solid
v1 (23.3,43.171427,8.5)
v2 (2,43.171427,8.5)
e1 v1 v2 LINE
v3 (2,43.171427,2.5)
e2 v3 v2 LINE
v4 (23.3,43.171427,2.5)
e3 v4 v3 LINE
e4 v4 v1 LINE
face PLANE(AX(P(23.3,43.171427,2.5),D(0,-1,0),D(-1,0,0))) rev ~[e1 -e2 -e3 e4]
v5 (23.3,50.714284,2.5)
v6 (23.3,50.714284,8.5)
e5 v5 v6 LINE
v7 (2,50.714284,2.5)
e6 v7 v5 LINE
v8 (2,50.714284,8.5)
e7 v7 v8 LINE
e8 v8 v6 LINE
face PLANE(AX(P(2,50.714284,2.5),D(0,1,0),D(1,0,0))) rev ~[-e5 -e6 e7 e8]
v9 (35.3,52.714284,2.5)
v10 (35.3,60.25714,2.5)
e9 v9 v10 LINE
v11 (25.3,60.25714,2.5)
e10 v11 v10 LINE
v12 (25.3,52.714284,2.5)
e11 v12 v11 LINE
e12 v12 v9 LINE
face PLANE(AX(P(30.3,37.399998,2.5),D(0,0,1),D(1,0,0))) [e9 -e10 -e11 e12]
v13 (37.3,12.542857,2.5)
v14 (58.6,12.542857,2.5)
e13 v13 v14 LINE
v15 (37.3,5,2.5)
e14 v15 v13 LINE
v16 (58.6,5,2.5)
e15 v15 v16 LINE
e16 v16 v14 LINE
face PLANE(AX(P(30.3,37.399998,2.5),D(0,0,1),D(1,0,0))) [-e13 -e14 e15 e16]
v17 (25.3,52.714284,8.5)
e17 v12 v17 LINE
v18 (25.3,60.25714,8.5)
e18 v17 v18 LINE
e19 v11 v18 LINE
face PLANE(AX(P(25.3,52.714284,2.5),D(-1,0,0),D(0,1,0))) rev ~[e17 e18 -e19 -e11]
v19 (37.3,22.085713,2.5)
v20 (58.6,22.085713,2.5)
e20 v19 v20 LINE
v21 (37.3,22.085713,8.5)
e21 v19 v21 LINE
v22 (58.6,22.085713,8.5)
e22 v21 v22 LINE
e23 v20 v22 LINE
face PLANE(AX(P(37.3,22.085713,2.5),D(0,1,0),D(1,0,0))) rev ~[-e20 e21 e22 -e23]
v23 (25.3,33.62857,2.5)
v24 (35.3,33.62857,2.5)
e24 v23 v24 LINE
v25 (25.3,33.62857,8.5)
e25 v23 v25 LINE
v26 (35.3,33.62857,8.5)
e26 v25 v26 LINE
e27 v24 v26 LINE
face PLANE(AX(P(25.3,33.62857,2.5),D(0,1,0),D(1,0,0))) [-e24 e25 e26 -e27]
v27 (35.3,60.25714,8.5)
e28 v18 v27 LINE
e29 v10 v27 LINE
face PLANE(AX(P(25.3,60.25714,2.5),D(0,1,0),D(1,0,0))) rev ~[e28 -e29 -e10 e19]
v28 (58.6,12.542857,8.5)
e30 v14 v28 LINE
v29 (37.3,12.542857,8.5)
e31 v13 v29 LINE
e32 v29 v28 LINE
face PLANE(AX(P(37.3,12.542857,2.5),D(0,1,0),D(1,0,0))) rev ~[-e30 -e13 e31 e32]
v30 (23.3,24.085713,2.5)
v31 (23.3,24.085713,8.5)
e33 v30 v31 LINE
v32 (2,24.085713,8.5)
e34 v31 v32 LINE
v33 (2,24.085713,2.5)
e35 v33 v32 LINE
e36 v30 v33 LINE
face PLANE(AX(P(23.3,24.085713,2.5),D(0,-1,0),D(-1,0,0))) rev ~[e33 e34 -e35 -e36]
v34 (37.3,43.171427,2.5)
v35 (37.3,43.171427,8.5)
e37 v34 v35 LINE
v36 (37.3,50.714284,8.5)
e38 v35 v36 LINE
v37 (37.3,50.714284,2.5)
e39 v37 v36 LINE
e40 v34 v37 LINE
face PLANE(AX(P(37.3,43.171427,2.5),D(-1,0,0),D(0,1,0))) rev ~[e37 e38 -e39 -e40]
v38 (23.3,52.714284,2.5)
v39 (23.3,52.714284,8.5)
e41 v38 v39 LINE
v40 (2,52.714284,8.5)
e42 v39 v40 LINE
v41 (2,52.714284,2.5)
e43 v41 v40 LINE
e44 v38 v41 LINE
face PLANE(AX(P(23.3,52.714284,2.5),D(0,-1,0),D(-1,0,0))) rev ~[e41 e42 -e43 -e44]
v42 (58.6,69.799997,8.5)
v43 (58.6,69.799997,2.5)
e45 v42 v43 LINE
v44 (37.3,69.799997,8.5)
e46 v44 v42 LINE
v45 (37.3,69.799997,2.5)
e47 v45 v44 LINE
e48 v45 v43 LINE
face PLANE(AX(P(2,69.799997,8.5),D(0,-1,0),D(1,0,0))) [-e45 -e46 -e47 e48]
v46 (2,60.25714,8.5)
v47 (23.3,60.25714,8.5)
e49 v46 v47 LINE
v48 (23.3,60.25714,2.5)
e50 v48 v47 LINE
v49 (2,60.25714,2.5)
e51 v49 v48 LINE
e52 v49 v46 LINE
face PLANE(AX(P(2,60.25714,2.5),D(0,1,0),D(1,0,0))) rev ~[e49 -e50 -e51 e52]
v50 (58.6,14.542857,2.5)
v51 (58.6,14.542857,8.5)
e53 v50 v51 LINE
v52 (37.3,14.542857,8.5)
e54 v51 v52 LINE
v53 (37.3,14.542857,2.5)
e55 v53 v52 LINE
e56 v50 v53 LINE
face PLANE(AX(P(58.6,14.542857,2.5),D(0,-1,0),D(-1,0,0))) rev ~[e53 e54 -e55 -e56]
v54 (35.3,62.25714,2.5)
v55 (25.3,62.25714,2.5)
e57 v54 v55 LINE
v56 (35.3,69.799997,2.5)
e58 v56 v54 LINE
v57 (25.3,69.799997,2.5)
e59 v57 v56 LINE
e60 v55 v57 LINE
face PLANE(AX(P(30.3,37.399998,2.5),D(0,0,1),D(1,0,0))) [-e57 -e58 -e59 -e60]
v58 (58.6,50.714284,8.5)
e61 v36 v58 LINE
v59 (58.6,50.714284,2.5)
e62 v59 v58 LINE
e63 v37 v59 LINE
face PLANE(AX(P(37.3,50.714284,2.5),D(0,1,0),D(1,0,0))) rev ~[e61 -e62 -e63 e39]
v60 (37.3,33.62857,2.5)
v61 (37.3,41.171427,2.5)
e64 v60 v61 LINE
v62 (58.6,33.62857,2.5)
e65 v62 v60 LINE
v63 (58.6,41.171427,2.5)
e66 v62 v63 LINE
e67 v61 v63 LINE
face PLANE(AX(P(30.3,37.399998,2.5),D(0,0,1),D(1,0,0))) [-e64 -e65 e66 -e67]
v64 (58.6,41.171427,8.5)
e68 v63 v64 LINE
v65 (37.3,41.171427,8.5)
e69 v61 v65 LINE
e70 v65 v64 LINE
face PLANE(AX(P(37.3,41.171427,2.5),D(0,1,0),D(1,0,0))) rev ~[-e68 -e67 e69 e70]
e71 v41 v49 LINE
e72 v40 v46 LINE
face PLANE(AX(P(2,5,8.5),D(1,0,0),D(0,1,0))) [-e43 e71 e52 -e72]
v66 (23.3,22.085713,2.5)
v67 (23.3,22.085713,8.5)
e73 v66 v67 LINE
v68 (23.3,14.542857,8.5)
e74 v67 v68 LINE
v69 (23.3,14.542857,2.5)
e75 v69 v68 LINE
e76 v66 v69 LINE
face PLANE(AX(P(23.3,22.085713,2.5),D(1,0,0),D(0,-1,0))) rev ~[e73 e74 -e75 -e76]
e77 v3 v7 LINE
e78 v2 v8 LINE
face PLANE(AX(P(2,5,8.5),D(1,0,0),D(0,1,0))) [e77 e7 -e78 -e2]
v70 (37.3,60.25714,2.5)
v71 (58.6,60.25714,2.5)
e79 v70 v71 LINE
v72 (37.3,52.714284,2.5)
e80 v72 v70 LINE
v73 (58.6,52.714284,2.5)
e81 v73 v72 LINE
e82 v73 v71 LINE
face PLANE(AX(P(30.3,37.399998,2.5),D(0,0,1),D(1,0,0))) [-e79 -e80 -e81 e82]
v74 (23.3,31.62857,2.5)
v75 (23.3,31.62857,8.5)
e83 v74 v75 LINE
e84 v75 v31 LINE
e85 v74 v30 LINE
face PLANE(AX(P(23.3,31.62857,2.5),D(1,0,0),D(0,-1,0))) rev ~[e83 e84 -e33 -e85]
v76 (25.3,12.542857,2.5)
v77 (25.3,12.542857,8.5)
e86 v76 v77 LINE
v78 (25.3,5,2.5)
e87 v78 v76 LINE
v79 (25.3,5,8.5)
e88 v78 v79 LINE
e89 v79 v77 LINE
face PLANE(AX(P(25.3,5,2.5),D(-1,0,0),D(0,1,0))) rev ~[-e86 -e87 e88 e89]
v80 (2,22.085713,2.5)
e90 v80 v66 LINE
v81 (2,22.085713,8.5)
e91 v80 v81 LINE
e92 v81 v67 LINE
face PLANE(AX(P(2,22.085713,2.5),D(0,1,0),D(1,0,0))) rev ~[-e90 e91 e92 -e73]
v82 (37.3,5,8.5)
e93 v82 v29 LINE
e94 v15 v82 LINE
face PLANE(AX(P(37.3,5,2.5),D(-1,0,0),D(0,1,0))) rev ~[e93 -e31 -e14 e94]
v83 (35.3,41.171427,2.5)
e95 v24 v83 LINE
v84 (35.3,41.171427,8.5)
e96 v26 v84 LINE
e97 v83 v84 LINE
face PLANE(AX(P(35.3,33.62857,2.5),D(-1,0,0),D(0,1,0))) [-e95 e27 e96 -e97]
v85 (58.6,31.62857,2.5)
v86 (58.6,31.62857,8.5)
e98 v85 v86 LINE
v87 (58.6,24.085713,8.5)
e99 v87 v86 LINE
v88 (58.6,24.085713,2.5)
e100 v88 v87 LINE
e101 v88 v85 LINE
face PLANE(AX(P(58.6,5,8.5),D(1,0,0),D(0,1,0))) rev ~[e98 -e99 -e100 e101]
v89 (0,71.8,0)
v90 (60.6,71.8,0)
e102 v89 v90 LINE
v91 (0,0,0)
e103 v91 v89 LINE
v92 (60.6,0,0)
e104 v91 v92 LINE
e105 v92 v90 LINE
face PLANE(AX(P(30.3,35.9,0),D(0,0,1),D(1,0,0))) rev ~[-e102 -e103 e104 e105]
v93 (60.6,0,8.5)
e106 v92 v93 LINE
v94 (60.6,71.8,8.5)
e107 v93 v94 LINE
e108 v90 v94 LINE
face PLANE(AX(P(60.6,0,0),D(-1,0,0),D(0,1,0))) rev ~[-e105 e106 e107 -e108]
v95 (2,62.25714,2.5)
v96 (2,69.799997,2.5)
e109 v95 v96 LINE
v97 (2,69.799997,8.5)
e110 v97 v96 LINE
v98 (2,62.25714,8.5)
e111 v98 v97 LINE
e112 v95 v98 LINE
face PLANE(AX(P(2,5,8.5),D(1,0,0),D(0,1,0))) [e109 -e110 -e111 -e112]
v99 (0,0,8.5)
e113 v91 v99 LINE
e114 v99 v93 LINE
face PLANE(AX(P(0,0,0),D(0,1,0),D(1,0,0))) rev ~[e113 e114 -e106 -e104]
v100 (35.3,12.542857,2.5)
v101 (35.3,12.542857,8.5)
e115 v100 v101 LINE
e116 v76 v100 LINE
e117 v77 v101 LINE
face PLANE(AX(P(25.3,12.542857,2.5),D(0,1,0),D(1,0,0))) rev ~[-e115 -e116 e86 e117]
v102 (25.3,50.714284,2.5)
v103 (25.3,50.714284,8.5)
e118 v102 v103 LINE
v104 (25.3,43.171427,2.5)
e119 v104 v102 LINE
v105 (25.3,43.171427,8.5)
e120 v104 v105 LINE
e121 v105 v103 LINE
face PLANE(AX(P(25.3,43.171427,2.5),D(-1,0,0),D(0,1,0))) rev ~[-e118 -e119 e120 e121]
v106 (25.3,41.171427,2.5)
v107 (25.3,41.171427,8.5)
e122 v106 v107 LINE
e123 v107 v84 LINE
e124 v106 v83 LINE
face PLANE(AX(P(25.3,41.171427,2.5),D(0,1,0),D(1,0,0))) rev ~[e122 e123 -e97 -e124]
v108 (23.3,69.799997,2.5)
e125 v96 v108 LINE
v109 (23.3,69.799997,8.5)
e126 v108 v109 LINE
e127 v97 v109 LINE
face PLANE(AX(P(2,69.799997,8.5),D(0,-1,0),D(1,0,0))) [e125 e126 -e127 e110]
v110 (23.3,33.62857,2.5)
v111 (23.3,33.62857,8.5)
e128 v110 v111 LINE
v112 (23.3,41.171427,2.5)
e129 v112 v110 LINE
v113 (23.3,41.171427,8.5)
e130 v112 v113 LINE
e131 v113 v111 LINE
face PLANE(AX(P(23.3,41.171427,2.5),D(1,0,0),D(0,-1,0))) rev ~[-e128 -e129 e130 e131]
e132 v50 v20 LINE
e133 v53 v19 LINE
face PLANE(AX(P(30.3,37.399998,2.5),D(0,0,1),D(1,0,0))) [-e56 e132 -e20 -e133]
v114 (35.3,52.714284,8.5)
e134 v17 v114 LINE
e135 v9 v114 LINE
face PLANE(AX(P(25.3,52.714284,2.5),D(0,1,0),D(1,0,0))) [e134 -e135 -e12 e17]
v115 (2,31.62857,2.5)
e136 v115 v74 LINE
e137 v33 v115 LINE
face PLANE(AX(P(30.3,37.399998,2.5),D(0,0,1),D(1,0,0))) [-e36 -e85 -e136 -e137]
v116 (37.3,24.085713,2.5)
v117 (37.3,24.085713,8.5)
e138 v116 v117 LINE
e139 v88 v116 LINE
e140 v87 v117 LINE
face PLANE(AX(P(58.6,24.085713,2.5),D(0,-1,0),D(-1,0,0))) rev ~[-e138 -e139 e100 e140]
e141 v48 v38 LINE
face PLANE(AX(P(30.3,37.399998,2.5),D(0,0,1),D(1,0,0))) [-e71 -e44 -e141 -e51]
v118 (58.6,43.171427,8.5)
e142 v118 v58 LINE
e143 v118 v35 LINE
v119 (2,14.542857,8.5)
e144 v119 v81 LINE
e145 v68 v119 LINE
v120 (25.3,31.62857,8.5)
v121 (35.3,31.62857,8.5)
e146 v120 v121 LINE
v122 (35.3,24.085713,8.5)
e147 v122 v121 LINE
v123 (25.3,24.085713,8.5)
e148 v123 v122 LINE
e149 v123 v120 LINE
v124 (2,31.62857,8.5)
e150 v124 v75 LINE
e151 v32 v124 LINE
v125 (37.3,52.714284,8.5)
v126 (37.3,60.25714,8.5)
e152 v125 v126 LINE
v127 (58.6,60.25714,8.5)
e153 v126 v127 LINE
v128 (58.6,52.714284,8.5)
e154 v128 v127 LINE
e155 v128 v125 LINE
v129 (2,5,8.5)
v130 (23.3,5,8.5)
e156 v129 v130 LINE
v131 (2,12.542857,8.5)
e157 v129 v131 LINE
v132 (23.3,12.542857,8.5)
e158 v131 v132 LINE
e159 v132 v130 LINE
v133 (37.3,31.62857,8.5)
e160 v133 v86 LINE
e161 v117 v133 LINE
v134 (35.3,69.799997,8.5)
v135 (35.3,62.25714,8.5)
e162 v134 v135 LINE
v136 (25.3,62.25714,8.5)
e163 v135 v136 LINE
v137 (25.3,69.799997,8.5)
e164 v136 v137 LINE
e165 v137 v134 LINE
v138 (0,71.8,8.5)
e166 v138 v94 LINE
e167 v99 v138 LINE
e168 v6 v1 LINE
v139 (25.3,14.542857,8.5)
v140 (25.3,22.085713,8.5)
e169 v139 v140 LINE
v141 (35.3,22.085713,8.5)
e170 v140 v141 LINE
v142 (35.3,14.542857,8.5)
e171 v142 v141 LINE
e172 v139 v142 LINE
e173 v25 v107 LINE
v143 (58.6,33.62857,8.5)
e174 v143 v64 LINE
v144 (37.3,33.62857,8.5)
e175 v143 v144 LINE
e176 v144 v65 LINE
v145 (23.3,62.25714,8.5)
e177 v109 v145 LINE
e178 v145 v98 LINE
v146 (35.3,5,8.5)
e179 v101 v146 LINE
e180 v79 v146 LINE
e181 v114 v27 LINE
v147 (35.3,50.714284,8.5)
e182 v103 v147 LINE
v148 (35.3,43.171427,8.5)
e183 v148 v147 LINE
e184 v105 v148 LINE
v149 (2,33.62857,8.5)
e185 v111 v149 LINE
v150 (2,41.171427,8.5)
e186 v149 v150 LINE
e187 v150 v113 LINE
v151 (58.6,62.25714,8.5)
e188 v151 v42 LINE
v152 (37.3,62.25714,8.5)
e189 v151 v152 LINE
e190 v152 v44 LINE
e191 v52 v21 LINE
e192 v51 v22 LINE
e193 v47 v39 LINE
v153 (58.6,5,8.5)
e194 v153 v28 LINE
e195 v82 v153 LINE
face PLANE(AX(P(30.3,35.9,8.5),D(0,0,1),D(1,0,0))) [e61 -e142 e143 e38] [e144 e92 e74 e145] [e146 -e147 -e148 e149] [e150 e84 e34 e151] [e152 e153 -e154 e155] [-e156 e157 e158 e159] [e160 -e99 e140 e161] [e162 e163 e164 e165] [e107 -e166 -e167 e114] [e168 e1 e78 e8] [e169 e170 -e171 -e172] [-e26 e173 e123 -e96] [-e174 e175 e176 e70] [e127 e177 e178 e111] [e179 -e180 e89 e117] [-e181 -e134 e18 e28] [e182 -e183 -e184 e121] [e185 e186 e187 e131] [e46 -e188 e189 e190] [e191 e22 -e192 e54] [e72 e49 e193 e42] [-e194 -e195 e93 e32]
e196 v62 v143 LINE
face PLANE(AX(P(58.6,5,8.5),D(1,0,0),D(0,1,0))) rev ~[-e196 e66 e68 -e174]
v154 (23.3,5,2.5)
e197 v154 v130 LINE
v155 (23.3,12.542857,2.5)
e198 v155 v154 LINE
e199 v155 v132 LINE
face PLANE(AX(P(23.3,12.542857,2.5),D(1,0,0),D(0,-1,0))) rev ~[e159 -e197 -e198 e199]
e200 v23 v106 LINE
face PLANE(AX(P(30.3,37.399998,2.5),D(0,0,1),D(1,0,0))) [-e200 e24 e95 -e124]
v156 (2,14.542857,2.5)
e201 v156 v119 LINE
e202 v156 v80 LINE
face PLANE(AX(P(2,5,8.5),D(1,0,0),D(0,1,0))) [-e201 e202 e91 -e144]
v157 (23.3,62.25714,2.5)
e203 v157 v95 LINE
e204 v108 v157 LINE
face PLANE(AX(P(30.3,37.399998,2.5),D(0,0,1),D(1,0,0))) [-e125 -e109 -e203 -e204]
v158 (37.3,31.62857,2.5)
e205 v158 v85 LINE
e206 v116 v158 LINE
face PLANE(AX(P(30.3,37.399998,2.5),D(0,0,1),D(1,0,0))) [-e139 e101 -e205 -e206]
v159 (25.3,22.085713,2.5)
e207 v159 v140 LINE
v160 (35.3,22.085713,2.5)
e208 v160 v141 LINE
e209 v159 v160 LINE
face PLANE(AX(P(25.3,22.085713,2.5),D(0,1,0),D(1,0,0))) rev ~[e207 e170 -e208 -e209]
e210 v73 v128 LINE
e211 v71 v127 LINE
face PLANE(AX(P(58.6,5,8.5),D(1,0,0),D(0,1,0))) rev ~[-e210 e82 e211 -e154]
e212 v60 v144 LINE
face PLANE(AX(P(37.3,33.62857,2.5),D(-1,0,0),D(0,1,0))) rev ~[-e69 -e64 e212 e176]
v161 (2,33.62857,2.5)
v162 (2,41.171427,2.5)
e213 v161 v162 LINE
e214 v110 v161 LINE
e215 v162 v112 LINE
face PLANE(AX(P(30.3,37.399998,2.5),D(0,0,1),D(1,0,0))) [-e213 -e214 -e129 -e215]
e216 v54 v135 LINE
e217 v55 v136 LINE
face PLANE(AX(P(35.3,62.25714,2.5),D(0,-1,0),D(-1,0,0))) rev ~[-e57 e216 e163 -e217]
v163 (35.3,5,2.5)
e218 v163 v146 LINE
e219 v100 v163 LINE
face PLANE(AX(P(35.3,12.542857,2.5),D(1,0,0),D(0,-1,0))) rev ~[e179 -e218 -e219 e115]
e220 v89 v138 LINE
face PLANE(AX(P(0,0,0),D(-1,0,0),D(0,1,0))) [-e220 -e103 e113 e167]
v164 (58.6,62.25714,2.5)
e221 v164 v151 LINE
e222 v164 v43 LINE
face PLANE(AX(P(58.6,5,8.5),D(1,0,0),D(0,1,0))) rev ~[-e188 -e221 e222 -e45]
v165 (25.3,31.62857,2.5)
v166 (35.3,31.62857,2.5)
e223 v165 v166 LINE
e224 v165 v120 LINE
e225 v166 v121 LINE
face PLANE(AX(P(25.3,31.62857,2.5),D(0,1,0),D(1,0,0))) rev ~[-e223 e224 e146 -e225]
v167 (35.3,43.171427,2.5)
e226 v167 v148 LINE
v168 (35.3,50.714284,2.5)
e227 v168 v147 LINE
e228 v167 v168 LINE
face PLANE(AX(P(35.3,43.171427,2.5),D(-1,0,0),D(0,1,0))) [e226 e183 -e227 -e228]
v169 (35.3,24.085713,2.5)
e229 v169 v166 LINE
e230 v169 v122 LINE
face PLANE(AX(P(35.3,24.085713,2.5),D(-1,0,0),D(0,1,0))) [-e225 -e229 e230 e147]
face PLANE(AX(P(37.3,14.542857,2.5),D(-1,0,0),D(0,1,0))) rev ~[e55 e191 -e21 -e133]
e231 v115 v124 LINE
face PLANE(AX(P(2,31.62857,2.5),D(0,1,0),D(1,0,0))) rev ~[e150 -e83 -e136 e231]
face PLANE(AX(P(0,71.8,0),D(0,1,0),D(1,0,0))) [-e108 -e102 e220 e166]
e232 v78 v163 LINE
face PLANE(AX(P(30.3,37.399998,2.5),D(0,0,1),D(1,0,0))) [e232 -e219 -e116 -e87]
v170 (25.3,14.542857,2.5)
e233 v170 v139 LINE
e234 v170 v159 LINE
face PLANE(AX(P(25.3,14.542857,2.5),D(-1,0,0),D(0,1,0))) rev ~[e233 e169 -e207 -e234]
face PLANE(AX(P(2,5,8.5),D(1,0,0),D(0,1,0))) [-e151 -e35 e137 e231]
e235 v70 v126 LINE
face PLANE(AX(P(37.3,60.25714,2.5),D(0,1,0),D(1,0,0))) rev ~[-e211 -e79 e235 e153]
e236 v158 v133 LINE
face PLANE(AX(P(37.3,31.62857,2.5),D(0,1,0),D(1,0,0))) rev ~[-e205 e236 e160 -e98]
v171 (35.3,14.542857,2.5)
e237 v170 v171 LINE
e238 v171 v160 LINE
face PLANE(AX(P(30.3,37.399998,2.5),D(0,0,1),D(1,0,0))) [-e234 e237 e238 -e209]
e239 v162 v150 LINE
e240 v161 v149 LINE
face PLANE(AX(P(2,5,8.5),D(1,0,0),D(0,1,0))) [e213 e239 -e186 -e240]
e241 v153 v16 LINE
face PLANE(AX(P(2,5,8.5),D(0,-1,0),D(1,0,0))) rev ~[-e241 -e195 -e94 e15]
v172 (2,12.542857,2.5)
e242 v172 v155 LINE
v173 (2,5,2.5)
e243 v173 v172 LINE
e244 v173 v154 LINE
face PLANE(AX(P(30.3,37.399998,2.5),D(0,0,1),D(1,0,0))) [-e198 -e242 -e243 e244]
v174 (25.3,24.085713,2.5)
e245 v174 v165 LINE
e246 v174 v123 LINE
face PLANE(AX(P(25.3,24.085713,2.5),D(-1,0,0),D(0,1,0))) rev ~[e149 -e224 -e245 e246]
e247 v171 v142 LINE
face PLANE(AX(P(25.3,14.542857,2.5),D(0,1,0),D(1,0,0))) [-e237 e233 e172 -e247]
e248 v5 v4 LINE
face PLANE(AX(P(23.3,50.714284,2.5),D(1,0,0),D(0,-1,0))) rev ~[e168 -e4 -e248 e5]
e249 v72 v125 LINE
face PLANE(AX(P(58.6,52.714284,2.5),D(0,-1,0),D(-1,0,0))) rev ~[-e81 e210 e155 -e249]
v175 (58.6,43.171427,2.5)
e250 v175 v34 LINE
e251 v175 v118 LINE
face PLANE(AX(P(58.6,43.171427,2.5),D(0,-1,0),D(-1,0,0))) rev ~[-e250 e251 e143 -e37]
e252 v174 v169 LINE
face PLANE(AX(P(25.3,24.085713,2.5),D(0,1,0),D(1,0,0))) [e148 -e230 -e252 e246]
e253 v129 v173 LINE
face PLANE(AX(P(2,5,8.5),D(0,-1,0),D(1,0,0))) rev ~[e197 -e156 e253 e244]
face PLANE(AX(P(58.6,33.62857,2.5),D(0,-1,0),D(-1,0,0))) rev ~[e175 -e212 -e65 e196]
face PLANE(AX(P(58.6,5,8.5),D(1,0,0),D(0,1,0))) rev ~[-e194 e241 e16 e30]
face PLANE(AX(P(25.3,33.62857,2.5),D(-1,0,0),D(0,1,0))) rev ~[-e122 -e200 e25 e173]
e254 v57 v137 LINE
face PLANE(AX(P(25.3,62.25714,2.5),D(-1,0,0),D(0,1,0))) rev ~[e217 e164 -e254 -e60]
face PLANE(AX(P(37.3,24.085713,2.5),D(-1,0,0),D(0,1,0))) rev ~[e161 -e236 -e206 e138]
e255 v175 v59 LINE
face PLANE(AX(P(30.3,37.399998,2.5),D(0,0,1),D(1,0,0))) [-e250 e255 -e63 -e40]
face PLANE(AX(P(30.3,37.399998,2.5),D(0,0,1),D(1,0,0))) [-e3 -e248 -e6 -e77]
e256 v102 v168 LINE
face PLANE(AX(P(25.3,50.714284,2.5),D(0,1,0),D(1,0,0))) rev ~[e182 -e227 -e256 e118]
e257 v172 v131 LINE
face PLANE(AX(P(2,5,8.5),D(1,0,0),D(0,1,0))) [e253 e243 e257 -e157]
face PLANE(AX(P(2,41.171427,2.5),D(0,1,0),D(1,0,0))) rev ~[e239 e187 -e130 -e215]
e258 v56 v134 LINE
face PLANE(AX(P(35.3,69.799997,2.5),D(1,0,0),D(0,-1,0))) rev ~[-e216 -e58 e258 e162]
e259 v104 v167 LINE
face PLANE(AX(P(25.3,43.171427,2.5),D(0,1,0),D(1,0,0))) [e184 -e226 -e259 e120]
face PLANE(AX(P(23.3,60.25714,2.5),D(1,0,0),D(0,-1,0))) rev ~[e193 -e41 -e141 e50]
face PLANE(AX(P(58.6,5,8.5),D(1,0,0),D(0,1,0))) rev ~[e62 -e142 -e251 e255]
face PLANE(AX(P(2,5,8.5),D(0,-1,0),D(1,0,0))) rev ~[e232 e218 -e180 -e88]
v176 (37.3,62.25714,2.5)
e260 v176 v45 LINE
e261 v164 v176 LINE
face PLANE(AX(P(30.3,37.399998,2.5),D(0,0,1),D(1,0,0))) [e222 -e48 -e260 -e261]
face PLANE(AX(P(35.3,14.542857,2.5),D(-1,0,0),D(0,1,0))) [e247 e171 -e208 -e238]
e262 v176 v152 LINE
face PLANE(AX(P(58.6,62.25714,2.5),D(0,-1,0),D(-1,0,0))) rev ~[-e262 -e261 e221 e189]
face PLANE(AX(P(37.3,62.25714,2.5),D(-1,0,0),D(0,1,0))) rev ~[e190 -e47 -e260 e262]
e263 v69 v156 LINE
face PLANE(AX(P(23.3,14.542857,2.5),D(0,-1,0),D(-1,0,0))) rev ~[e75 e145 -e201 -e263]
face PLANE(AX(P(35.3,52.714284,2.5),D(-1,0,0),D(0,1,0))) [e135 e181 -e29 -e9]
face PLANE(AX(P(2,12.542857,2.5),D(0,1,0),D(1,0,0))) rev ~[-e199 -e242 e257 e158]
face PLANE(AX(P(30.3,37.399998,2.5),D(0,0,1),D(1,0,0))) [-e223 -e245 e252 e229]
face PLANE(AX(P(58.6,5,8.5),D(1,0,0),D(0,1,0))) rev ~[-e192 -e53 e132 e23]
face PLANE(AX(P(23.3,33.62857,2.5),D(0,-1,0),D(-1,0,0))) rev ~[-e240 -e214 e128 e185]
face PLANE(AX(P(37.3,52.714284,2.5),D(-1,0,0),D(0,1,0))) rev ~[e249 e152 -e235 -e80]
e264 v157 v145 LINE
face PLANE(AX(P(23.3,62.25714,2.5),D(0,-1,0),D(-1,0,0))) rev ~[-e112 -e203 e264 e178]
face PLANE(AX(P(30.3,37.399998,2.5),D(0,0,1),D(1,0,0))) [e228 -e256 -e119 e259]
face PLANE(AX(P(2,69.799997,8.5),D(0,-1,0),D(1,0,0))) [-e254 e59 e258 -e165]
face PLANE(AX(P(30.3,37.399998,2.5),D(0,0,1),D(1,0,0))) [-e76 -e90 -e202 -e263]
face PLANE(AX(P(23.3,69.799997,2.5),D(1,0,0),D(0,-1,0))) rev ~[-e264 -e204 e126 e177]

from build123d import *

# Parameters (mm, degrees)
F0_W     = 60.6
F0_H     = 71.8
F1_DEPTH = 8.5
F2_W     = 56.6
F2_H     = 64.7999969125
F3_DEPTH = 6
F4_W     = 10
F4_H     = 7.5428567018
F5_DEPTH = 6


with BuildPart() as f1:
    # F0 (on Top) → F1 (new body)
    with BuildSketch(Plane.XY):
        with Locations((30.3, 35.9)):
            Rectangle(F0_W, F0_H)
    extrude(amount=F1_DEPTH)

    # F2 (on face) → F3 (cut)
    with BuildSketch(Plane.XY.offset(8.5)):
        with Locations((30.3, 37.3999984562)):
            Rectangle(F2_W, F2_H)
    extrude(amount=-F3_DEPTH, mode=Mode.SUBTRACT)

    # F4 (on face) → F5 (join)
    with BuildSketch(Plane.XY.offset(2.5)):
        Polygon((25.3, 69.7999969125), (23.3, 69.7999969125), (23.3, 62.2571402107), (2, 62.2571402107), (2, 60.2571402107), (23.3, 60.2571402107), (23.3, 52.7142835089), (2, 52.7142835089), (2, 50.7142835089), (23.3, 50.7142835089), (23.3, 43.1714268071), (2, 43.1714268071), (2, 41.1714268071), (23.3, 41.1714268071), (23.3, 33.6285701053), (2, 33.6285701053), (2, 31.6285701053), (23.3, 31.6285701053), (23.3, 24.0857134036), (2, 24.0857134036), (2, 22.0857134036), (23.3, 22.0857134036), (23.3, 14.5428567018), (2, 14.5428567018), (2, 12.5428567018), (23.3, 12.5428567018), (23.3, 5), (25.3, 5), (25.3, 12.5428567018), (35.3, 12.5428567018), (35.3, 5), (37.3, 5), (37.3, 12.5428567018), (58.6, 12.5428567018), (58.6, 14.5428567018), (37.3, 14.5428567018), (37.3, 22.0857134036), (58.6, 22.0857134036), (58.6, 24.0857134036), (37.3, 24.0857134036), (37.3, 31.6285701053), (58.6, 31.6285701053), (58.6, 33.6285701053), (37.3, 33.6285701053), (37.3, 41.1714268071), (58.6, 41.1714268071), (58.6, 43.1714268071), (37.3, 43.1714268071), (37.3, 50.7142835089), (58.6, 50.7142835089), (58.6, 52.7142835089), (37.3, 52.7142835089), (37.3, 60.2571402107), (58.6, 60.2571402107), (58.6, 62.2571402107), (37.3, 62.2571402107), (37.3, 69.7999969125), (35.3, 69.7999969125), (35.3, 62.2571402107), (25.3, 62.2571402107), align=None)
        with Locations((30.3, 18.3142850527)):
            Rectangle(F4_W, F4_H, mode=Mode.SUBTRACT)
        with Locations((30.3, 27.8571417545)):
            Rectangle(F4_W, F4_H, mode=Mode.SUBTRACT)
        with Locations((30.3, 37.3999984562)):
            Rectangle(F4_W, F4_H, mode=Mode.SUBTRACT)
        with Locations((30.3, 46.942855158)):
            Rectangle(F4_W, F4_H, mode=Mode.SUBTRACT)
        with Locations((30.3, 56.4857118598)):
            Rectangle(F4_W, F4_H, mode=Mode.SUBTRACT)
    extrude(amount=F5_DEPTH)


with BuildPart() as f6_1:
    # F6: copy of F1
    add(f1.part)


solid = f1.part
